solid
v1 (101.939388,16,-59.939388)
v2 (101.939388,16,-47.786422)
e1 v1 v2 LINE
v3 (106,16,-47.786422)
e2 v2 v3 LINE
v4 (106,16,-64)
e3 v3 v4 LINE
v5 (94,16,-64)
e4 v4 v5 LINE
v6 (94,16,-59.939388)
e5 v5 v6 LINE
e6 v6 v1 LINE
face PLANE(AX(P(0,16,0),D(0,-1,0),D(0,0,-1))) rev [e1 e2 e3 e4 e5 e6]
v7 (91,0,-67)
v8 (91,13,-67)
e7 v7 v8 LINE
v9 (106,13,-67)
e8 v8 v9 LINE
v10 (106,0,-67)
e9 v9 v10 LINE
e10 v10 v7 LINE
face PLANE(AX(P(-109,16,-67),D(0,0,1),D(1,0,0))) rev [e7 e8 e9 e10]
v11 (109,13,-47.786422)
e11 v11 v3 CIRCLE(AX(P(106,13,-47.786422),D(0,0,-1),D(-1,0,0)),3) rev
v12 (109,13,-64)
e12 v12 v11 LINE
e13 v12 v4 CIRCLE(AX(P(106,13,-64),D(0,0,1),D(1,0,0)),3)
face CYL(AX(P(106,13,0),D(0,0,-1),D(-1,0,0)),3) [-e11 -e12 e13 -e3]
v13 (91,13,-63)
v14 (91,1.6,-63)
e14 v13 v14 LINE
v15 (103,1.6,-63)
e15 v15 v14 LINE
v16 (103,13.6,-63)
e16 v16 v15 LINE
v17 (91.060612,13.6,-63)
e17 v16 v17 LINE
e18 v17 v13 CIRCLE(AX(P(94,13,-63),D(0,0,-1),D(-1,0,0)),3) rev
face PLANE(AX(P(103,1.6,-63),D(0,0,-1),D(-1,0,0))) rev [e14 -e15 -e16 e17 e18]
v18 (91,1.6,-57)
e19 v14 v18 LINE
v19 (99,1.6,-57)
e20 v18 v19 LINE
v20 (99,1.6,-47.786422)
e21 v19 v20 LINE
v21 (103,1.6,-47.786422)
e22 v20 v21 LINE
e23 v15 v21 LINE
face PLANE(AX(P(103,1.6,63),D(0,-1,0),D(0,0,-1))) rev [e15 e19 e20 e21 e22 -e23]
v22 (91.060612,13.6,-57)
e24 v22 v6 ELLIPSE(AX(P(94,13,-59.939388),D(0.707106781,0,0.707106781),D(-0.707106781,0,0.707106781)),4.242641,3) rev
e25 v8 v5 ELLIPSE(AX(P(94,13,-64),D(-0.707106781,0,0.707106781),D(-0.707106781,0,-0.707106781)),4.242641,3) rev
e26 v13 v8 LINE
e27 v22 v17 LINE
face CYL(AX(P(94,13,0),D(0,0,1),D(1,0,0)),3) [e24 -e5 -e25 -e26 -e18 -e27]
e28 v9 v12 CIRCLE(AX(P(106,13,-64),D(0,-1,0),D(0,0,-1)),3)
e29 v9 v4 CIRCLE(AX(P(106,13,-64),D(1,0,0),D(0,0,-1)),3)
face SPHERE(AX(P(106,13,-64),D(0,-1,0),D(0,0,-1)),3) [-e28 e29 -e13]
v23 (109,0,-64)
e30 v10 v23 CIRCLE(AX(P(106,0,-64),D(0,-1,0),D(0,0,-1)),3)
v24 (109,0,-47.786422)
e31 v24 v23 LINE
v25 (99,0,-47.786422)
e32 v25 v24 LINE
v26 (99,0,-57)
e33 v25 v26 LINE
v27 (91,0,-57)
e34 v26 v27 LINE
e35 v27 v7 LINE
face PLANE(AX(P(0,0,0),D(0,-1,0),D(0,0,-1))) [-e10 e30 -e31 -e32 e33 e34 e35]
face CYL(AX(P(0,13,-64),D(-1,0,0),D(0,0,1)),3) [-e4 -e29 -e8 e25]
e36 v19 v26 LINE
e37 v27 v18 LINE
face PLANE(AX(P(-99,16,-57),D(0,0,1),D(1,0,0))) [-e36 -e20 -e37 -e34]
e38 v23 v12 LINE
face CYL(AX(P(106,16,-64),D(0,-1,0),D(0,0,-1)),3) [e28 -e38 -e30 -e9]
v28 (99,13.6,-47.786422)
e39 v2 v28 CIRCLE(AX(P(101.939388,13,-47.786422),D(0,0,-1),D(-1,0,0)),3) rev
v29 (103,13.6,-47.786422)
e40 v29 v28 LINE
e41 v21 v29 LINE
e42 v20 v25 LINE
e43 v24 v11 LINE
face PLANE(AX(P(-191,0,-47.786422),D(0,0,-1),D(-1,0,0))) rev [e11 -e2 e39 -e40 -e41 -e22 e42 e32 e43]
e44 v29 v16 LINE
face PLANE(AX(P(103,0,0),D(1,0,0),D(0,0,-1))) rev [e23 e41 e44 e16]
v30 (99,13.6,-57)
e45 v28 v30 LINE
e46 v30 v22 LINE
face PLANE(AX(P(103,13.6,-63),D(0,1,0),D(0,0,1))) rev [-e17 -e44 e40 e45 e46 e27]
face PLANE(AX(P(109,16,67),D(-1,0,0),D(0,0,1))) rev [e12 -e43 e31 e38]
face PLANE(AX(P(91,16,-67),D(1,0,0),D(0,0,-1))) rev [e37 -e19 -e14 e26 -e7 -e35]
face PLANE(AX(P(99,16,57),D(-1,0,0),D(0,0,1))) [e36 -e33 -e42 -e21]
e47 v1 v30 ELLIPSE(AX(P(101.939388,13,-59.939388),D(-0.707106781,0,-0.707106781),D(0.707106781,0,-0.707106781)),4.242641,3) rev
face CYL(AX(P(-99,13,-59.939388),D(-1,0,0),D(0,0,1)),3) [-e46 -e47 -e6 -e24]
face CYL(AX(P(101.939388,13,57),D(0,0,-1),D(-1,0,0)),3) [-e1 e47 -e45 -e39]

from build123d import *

# Parameters (mm, degrees)
SKETCH_221_W        = 218
SKETCH_221_H        = 134
SKETCH_221_W_2      = 198
SKETCH_221_H_2      = 114
EXTRUDE_2_DEPTH     = 16
SKETCH_2_W          = 126
SKETCH_2_H          = 12
CUT_EXTRUDE_1_DEPTH = 212
SKETCH_3_W          = 182
SKETCH_3_H          = 14.4
CUT_EXTRUDE_2_DEPTH = 134
SKETCH_4_R          = 1
CUT_EXTRUDE_3_DEPTH = 1.6
FILLET_1_R          = 3
FILLET_2_R          = 3
FILLET_3_R          = 3
SKETCH_6_W          = 206.897999361
SKETCH_6_H          = 19.177389722
CUT_EXTRUDE_5_DEPTH = 200
SKETCH_7_W          = 123.024935324
SKETCH_7_H          = 17.566945153
CUT_EXTRUDE_6_DEPTH = 300


with BuildPart() as part:
    # Sketch 221 → Бобышка-Вытянуть2 (new body)
    with BuildSketch(Plane(origin=(0, 0, 0), x_dir=(1, 0, 0), z_dir=(0, 1, 0))):
        Rectangle(SKETCH_221_W, SKETCH_221_H)
        Rectangle(SKETCH_221_W_2, SKETCH_221_H_2, mode=Mode.SUBTRACT)
    extrude(amount=EXTRUDE_2_DEPTH)

    # Эскиз2 → Вырез-Вытянуть1 (cut)
    with BuildSketch(Plane.ZY.offset(109)):
        with Locations((0, 7.6)):
            Rectangle(SKETCH_2_W, SKETCH_2_H)
    extrude(amount=-CUT_EXTRUDE_1_DEPTH, mode=Mode.SUBTRACT)

    # Эскиз3 → Вырез-Вытянуть2 (cut)
    with BuildSketch(Plane.XY.offset(67)):
        with Locations((0, 8.8)):
            Rectangle(SKETCH_3_W, SKETCH_3_H)
    extrude(amount=-CUT_EXTRUDE_2_DEPTH, mode=Mode.SUBTRACT)

    # Эскиз4 → Вырез-Вытянуть3 (cut)
    with BuildSketch(Plane(origin=(0, 1.6, 0), x_dir=(1, 0, 0), z_dir=(0, 1, 0))):
        with Locations(Location((-74.698916604, 62, 0), (0, 0, 270))):
            Circle(SKETCH_4_R)
        with Locations(Location((-74.698916604, -62, 0), (0, 0, 270))):
            Circle(SKETCH_4_R)
        with Locations(Location((74.698916604, -62, 0), (0, 0, 90))):
            Circle(SKETCH_4_R)
        with Locations(Location((74.698916604, 62, 0), (0, 0, 90))):
            Circle(SKETCH_4_R)
    extrude(amount=-CUT_EXTRUDE_3_DEPTH, mode=Mode.SUBTRACT)

    # Скругление1
    fillet_1_edges = [part.edges().sort_by_distance(p)[0] for p in [
        (109, 8, 67),
        (-109, 8, 67),
        (-109, 8, -67),
        (109, 8, -67),
    ]]
    fillet(fillet_1_edges, radius=FILLET_1_R)

    # Скругление2
    # the kernel refuses this fillet: 3 mm, written as the material it takes off along each edge
    with BuildSketch(Plane(origin=(-91, 16, -49.5), x_dir=(-1, 0, 0), z_dir=(0, 0, -1)), Plane(origin=(-91, 16, 74.5), x_dir=(-1, 0, 0), z_dir=(0, 0, -1))) as fillet_2_piece_1:
        with BuildLine():
            CenterArc((FILLET_2_R, -FILLET_2_R), FILLET_2_R, 90, 90)
            Line((0, -FILLET_2_R), (0, 0))
            Line((0, 0), (FILLET_2_R, 0))
        make_face()
    extrude(amount=25, mode=Mode.SUBTRACT)
    with BuildSketch(Plane(origin=(-83.651530772, 16, -57), x_dir=(0, 0, -1), z_dir=(-1, 0, 0)), Plane(origin=(-99, 16, 57), x_dir=(0, 0, 1), z_dir=(1, 0, 0))) as fillet_2_piece_2:
        with BuildLine():
            CenterArc((2.939387691, 3), FILLET_2_R, 191.536959033, 78.463040967)
            Line((0, 2.4), (0, 0))
            Line((0, 0), (2.939387691, 0))
        make_face()
    extrude(amount=15.348469228, mode=Mode.SUBTRACT)
    with BuildSketch(Plane(origin=(-99, 16, -57), x_dir=(-1, 0, 0), z_dir=(0, 0, 1))) as fillet_2_piece_3:
        with BuildLine():
            CenterArc((2.939387691, 3), FILLET_2_R, 191.536959033, 78.463040967)
            Line((0, 2.4), (0, 0))
            Line((0, 0), (2.939387691, 0))
        make_face()
    extrude(amount=114, mode=Mode.SUBTRACT)
    with BuildSketch(Plane(origin=(-106, 16, 67), x_dir=(0, -1, 0), z_dir=(1, 0, 0))) as fillet_2_piece_4:
        with BuildLine():
            CenterArc((FILLET_2_R, FILLET_2_R), FILLET_2_R, 180, 90)
            Line((0, FILLET_2_R), (0, 0))
            Line((0, 0), (FILLET_2_R, 0))
        make_face()
    extrude(amount=22.5, mode=Mode.SUBTRACT)
    with BuildSketch(Plane(origin=(-106, 16, 64), x_dir=(0, 0, 1), z_dir=(1, 0, 0))) as fillet_2_piece_5:
        with BuildLine():
            CenterArc((3 - FILLET_2_R, FILLET_2_R), FILLET_2_R, 270, 90)
            Line((3 - FILLET_2_R, 0), (3, 0))
            Line((3, 0), (3, FILLET_2_R))
        make_face()
    revolve(axis=Axis((-106, 16, 64), (0, -1, 0)), revolution_arc=90, mode=Mode.SUBTRACT)
    with BuildSketch(Plane(origin=(-109, 16, -64), x_dir=(1, 0, 0), z_dir=(0, 0, 1))) as fillet_2_piece_6:
        with BuildLine():
            CenterArc((FILLET_2_R, -FILLET_2_R), FILLET_2_R, 90, 90)
            Line((0, -FILLET_2_R), (0, 0))
            Line((0, 0), (FILLET_2_R, 0))
        make_face()
    extrude(amount=128, mode=Mode.SUBTRACT)
    with BuildSketch(Plane(origin=(-106, 16, -64), x_dir=(-1, 0, 0), z_dir=(0, 0, 1))) as fillet_2_piece_7:
        with BuildLine():
            CenterArc((3 - FILLET_2_R, FILLET_2_R), FILLET_2_R, 270, 90)
            Line((3, FILLET_2_R), (3, 0))
            Line((3, 0), (3 - FILLET_2_R, 0))
        make_face()
    revolve(axis=Axis((-106, 16, -64), (0, -1, 0)), revolution_arc=90, mode=Mode.SUBTRACT)
    with BuildSketch(Plane(origin=(-83.5, 16, -67), x_dir=(0, 0, 1), z_dir=(-1, 0, 0))) as fillet_2_piece_8:
        with BuildLine():
            CenterArc((FILLET_2_R, -FILLET_2_R), FILLET_2_R, 90, 90)
            Line((0, -FILLET_2_R), (0, 0))
            Line((0, 0), (FILLET_2_R, 0))
        make_face()
    extrude(amount=22.5, mode=Mode.SUBTRACT)
    with BuildSketch(Plane(origin=(-91, 16, -57), x_dir=(0, 0, -1), z_dir=(-1, 0, 0))) as fillet_2_piece_9a_section:
        with BuildLine():
            CenterArc((2.939387691, 3), FILLET_2_R, 191.536959033, 78.463040967)
            Line((0, 2.4), (0, 0))
            Line((0, 0), (2.939387691, 0))
        make_face()
    fillet_2_piece_9a = extrude(amount=15.348469228, mode=Mode.PRIVATE)
    fillet_2_piece_9a = split(fillet_2_piece_9a, bisect_by=Plane(origin=(-99, 16, -57), z_dir=(-1, 0, 0)), keep=Keep.TOP, mode=Mode.PRIVATE)
    with BuildSketch(Plane(origin=(-99, 16, -64.348469228), x_dir=(-1, 0, 0), z_dir=(0, 0, 1))) as fillet_2_piece_9b_section:
        with BuildLine():
            CenterArc((2.939387691, 3), FILLET_2_R, 191.536959033, 78.463040967)
            Line((0, 2.4), (0, 0))
            Line((0, 0), (2.939387691, 0))
        make_face()
    fillet_2_piece_9b = extrude(amount=121.348469228, mode=Mode.PRIVATE)
    fillet_2_piece_9b = split(fillet_2_piece_9b, bisect_by=Plane(origin=(-99, 16, -57), z_dir=(0, 0, -1)), keep=Keep.TOP, mode=Mode.PRIVATE)
    fillet_2_piece_9b = split(fillet_2_piece_9b, bisect_by=Plane(origin=(-99, 16, -63), z_dir=(0, 0, 1)), keep=Keep.TOP, mode=Mode.PRIVATE)
    fillet_2_piece_9 = fillet_2_piece_9a & fillet_2_piece_9b
    add(fillet_2_piece_9, mode=Mode.SUBTRACT)
    with BuildSketch(Plane(origin=(-106.348469228, 16, 57), x_dir=(0, 0, 1), z_dir=(1, 0, 0))) as fillet_2_piece_10a_section:
        with BuildLine():
            CenterArc((2.939387691, 3), FILLET_2_R, 191.536959033, 78.463040967)
            Line((0, 2.4), (0, 0))
            Line((0, 0), (2.939387691, 0))
        make_face()
    fillet_2_piece_10a = extrude(amount=15.348469228, mode=Mode.PRIVATE)
    fillet_2_piece_10a = split(fillet_2_piece_10a, bisect_by=Plane(origin=(-99, 16, 57), z_dir=(-1, 0, 0)), keep=Keep.TOP, mode=Mode.PRIVATE)
    with BuildSketch(Plane(origin=(-99, 16, -57), x_dir=(-1, 0, 0), z_dir=(0, 0, 1))) as fillet_2_piece_10b_section:
        with BuildLine():
            CenterArc((2.939387691, 3), FILLET_2_R, 191.536959033, 78.463040967)
            Line((0, 2.4), (0, 0))
            Line((0, 0), (2.939387691, 0))
        make_face()
    fillet_2_piece_10b = extrude(amount=121.348469228, mode=Mode.PRIVATE)
    fillet_2_piece_10b = split(fillet_2_piece_10b, bisect_by=Plane(origin=(-99, 16, 57), z_dir=(0, 0, 1)), keep=Keep.TOP, mode=Mode.PRIVATE)
    fillet_2_piece_10b = split(fillet_2_piece_10b, bisect_by=Plane(origin=(-99, 16, 63), z_dir=(0, 0, -1)), keep=Keep.TOP, mode=Mode.PRIVATE)
    fillet_2_piece_10 = fillet_2_piece_10a & fillet_2_piece_10b
    add(fillet_2_piece_10, mode=Mode.SUBTRACT)

    # Скругление3
    # the kernel refuses this fillet: 3 mm, written as the material it takes off along each edge
    with BuildSketch(Plane(origin=(106, 16, 64), x_dir=(0, 0, 1), z_dir=(-1, 0, 0))) as fillet_3_piece_1:
        with BuildLine():
            CenterArc((3 - FILLET_3_R, -FILLET_3_R), FILLET_3_R, 0, 90)
            Line((3, -FILLET_3_R), (3, 0))
            Line((3, 0), (3 - FILLET_3_R, 0))
        make_face()
    revolve(axis=Axis((106, 16, 64), (0, 1, 0)), revolution_arc=90, mode=Mode.SUBTRACT)
    with BuildSketch(Plane(origin=(83.5, 16, 67), x_dir=(0, -1, 0), z_dir=(1, 0, 0)), Plane(origin=(106, 16, -67), x_dir=(0, -1, 0), z_dir=(-1, 0, 0))) as fillet_3_piece_2:
        with BuildLine():
            CenterArc((FILLET_3_R, FILLET_3_R), FILLET_3_R, 180, 90)
            Line((0, FILLET_3_R), (0, 0))
            Line((0, 0), (FILLET_3_R, 0))
        make_face()
    extrude(amount=22.5, mode=Mode.SUBTRACT)
    with BuildSketch(Plane(origin=(91, 16, 74.5), x_dir=(0, -1, 0), z_dir=(0, 0, -1)), Plane(origin=(91, 16, -49.5), x_dir=(0, -1, 0), z_dir=(0, 0, -1))) as fillet_3_piece_3:
        with BuildLine():
            CenterArc((FILLET_3_R, -FILLET_3_R), FILLET_3_R, 90, 90)
            Line((0, -FILLET_3_R), (0, 0))
            Line((0, 0), (FILLET_3_R, 0))
        make_face()
    extrude(amount=25, mode=Mode.SUBTRACT)
    with BuildSketch(Plane(origin=(83.651530772, 16, 57), x_dir=(0, -1.0, 1.5720758028687117e-12), z_dir=(1, 0, 0)), Plane(origin=(99, 16, -57), x_dir=(0, -1.0, -1.5750363976010446e-12), z_dir=(-1, 0, 0))) as fillet_3_piece_4:
        with BuildLine():
            CenterArc((3, -2.939387691), FILLET_3_R, 101.536959033, 78.463040967)
            Line((0, -2.939387691), (0, 0))
            Line((0, 0), (2.4, 0))
        make_face()
    extrude(amount=15.348469228, mode=Mode.SUBTRACT)
    with BuildSketch(Plane(origin=(99, 16, 57), x_dir=(1.56911520813638e-12, -1.0, 0), z_dir=(0, 0, -1))) as fillet_3_piece_5:
        with BuildLine():
            CenterArc((3, -2.939387691), FILLET_3_R, 101.536959033, 78.463040967)
            Line((0, -2.939387691), (0, 0))
            Line((0, 0), (2.4, 0))
        make_face()
    extrude(amount=114, mode=Mode.SUBTRACT)
    with BuildSketch(Plane(origin=(106, 16, -64), x_dir=(1, 0, 0), z_dir=(0, 0, 1))) as fillet_3_piece_6:
        with BuildLine():
            CenterArc((3 - FILLET_3_R, -FILLET_3_R), FILLET_3_R, 0, 90)
            Line((3 - FILLET_3_R, 0), (3, 0))
            Line((3, 0), (3, -FILLET_3_R))
        make_face()
    revolve(axis=Axis((106, 16, -64), (0, 1, 0)), revolution_arc=90, mode=Mode.SUBTRACT)
    with BuildSketch(Plane(origin=(109, 16, 64), x_dir=(0, -1, 0), z_dir=(0, 0, -1))) as fillet_3_piece_7:
        with BuildLine():
            CenterArc((FILLET_3_R, FILLET_3_R), FILLET_3_R, 180, 90)
            Line((0, FILLET_3_R), (0, 0))
            Line((0, 0), (FILLET_3_R, 0))
        make_face()
    extrude(amount=128, mode=Mode.SUBTRACT)
    with BuildSketch(Plane(origin=(91, 16, 57), x_dir=(0, -1.0, 1.5720758028687117e-12), z_dir=(1, 0, 0))) as fillet_3_piece_8a_section:
        with BuildLine():
            CenterArc((3, -2.939387691), FILLET_3_R, 101.536959033, 78.463040967)
            Line((0, -2.939387691), (0, 0))
            Line((0, 0), (2.4, 0))
        make_face()
    fillet_3_piece_8a = extrude(amount=15.348469228, mode=Mode.PRIVATE)
    fillet_3_piece_8a = split(fillet_3_piece_8a, bisect_by=Plane(origin=(103, 16, 57), z_dir=(-1, 0, 0)), keep=Keep.TOP, mode=Mode.PRIVATE)
    fillet_3_piece_8a = split(fillet_3_piece_8a, bisect_by=Plane(origin=(99, 16, 57), z_dir=(1, 0, 0)), keep=Keep.TOP, mode=Mode.PRIVATE)
    with BuildSketch(Plane(origin=(99, 16, 64.348469228), x_dir=(1.56911520813638e-12, -1.0, 0), z_dir=(0, 0, -1))) as fillet_3_piece_8b_section:
        with BuildLine():
            CenterArc((3, -2.939387691), FILLET_3_R, 101.536959033, 78.463040967)
            Line((0, -2.939387691), (0, 0))
            Line((0, 0), (2.4, 0))
        make_face()
    fillet_3_piece_8b = extrude(amount=121.348469228, mode=Mode.PRIVATE)
    fillet_3_piece_8b = split(fillet_3_piece_8b, bisect_by=Plane(origin=(99, 16, 63), z_dir=(0, 0, -1)), keep=Keep.TOP, mode=Mode.PRIVATE)
    fillet_3_piece_8b = split(fillet_3_piece_8b, bisect_by=Plane(origin=(99, 16, 57), z_dir=(0, 0, 1)), keep=Keep.TOP, mode=Mode.PRIVATE)
    fillet_3_piece_8 = fillet_3_piece_8a & fillet_3_piece_8b
    add(fillet_3_piece_8, mode=Mode.SUBTRACT)
    with BuildSketch(Plane(origin=(99, 16, 57), x_dir=(1.56911520813638e-12, -1.0, 0), z_dir=(0, 0, -1))) as fillet_3_piece_9a_section:
        with BuildLine():
            CenterArc((3, -2.939387691), FILLET_3_R, 101.536959033, 78.463040967)
            Line((0, -2.939387691), (0, 0))
            Line((0, 0), (2.4, 0))
        make_face()
    fillet_3_piece_9a = extrude(amount=121.348469228, mode=Mode.PRIVATE)
    fillet_3_piece_9a = split(fillet_3_piece_9a, bisect_by=Plane(origin=(99, 16, -63), z_dir=(0, 0, 1)), keep=Keep.TOP, mode=Mode.PRIVATE)
    fillet_3_piece_9a = split(fillet_3_piece_9a, bisect_by=Plane(origin=(99, 16, -57), z_dir=(0, 0, -1)), keep=Keep.TOP, mode=Mode.PRIVATE)
    with BuildSketch(Plane(origin=(106.348469228, 16, -57), x_dir=(0, -1.0, -1.5750363976010446e-12), z_dir=(-1, 0, 0))) as fillet_3_piece_9b_section:
        with BuildLine():
            CenterArc((3, -2.939387691), FILLET_3_R, 101.536959033, 78.463040967)
            Line((0, -2.939387691), (0, 0))
            Line((0, 0), (2.4, 0))
        make_face()
    fillet_3_piece_9b = extrude(amount=15.348469228, mode=Mode.PRIVATE)
    fillet_3_piece_9b = split(fillet_3_piece_9b, bisect_by=Plane(origin=(103, 16, -57), z_dir=(-1, 0, 0)), keep=Keep.TOP, mode=Mode.PRIVATE)
    fillet_3_piece_9b = split(fillet_3_piece_9b, bisect_by=Plane(origin=(99, 16, -57), z_dir=(1, 0, 0)), keep=Keep.TOP, mode=Mode.PRIVATE)
    fillet_3_piece_9 = fillet_3_piece_9a & fillet_3_piece_9b
    add(fillet_3_piece_9, mode=Mode.SUBTRACT)

    # Эскиз6 → Вырез-Вытянуть5 (cut)
    with BuildSketch(Plane(origin=(0, 0, -67), x_dir=(-1, 0, 0), z_dir=(0, 0, -1))):
        with Locations((12.448999681, 9.588694861)):
            Rectangle(SKETCH_6_W, SKETCH_6_H)
    extrude(amount=-CUT_EXTRUDE_5_DEPTH, mode=Mode.SUBTRACT)

    # Эскиз7 → Вырез-Вытянуть6 (cut)
    with BuildSketch(Plane(origin=(109, 0, 0), x_dir=(0, 0, -1), z_dir=(1, 0, 0))):
        with Locations((-13.726045872, 8.783472577)):
            Rectangle(SKETCH_7_W, SKETCH_7_H)
    extrude(amount=-CUT_EXTRUDE_6_DEPTH, mode=Mode.SUBTRACT)


solid = part.part
